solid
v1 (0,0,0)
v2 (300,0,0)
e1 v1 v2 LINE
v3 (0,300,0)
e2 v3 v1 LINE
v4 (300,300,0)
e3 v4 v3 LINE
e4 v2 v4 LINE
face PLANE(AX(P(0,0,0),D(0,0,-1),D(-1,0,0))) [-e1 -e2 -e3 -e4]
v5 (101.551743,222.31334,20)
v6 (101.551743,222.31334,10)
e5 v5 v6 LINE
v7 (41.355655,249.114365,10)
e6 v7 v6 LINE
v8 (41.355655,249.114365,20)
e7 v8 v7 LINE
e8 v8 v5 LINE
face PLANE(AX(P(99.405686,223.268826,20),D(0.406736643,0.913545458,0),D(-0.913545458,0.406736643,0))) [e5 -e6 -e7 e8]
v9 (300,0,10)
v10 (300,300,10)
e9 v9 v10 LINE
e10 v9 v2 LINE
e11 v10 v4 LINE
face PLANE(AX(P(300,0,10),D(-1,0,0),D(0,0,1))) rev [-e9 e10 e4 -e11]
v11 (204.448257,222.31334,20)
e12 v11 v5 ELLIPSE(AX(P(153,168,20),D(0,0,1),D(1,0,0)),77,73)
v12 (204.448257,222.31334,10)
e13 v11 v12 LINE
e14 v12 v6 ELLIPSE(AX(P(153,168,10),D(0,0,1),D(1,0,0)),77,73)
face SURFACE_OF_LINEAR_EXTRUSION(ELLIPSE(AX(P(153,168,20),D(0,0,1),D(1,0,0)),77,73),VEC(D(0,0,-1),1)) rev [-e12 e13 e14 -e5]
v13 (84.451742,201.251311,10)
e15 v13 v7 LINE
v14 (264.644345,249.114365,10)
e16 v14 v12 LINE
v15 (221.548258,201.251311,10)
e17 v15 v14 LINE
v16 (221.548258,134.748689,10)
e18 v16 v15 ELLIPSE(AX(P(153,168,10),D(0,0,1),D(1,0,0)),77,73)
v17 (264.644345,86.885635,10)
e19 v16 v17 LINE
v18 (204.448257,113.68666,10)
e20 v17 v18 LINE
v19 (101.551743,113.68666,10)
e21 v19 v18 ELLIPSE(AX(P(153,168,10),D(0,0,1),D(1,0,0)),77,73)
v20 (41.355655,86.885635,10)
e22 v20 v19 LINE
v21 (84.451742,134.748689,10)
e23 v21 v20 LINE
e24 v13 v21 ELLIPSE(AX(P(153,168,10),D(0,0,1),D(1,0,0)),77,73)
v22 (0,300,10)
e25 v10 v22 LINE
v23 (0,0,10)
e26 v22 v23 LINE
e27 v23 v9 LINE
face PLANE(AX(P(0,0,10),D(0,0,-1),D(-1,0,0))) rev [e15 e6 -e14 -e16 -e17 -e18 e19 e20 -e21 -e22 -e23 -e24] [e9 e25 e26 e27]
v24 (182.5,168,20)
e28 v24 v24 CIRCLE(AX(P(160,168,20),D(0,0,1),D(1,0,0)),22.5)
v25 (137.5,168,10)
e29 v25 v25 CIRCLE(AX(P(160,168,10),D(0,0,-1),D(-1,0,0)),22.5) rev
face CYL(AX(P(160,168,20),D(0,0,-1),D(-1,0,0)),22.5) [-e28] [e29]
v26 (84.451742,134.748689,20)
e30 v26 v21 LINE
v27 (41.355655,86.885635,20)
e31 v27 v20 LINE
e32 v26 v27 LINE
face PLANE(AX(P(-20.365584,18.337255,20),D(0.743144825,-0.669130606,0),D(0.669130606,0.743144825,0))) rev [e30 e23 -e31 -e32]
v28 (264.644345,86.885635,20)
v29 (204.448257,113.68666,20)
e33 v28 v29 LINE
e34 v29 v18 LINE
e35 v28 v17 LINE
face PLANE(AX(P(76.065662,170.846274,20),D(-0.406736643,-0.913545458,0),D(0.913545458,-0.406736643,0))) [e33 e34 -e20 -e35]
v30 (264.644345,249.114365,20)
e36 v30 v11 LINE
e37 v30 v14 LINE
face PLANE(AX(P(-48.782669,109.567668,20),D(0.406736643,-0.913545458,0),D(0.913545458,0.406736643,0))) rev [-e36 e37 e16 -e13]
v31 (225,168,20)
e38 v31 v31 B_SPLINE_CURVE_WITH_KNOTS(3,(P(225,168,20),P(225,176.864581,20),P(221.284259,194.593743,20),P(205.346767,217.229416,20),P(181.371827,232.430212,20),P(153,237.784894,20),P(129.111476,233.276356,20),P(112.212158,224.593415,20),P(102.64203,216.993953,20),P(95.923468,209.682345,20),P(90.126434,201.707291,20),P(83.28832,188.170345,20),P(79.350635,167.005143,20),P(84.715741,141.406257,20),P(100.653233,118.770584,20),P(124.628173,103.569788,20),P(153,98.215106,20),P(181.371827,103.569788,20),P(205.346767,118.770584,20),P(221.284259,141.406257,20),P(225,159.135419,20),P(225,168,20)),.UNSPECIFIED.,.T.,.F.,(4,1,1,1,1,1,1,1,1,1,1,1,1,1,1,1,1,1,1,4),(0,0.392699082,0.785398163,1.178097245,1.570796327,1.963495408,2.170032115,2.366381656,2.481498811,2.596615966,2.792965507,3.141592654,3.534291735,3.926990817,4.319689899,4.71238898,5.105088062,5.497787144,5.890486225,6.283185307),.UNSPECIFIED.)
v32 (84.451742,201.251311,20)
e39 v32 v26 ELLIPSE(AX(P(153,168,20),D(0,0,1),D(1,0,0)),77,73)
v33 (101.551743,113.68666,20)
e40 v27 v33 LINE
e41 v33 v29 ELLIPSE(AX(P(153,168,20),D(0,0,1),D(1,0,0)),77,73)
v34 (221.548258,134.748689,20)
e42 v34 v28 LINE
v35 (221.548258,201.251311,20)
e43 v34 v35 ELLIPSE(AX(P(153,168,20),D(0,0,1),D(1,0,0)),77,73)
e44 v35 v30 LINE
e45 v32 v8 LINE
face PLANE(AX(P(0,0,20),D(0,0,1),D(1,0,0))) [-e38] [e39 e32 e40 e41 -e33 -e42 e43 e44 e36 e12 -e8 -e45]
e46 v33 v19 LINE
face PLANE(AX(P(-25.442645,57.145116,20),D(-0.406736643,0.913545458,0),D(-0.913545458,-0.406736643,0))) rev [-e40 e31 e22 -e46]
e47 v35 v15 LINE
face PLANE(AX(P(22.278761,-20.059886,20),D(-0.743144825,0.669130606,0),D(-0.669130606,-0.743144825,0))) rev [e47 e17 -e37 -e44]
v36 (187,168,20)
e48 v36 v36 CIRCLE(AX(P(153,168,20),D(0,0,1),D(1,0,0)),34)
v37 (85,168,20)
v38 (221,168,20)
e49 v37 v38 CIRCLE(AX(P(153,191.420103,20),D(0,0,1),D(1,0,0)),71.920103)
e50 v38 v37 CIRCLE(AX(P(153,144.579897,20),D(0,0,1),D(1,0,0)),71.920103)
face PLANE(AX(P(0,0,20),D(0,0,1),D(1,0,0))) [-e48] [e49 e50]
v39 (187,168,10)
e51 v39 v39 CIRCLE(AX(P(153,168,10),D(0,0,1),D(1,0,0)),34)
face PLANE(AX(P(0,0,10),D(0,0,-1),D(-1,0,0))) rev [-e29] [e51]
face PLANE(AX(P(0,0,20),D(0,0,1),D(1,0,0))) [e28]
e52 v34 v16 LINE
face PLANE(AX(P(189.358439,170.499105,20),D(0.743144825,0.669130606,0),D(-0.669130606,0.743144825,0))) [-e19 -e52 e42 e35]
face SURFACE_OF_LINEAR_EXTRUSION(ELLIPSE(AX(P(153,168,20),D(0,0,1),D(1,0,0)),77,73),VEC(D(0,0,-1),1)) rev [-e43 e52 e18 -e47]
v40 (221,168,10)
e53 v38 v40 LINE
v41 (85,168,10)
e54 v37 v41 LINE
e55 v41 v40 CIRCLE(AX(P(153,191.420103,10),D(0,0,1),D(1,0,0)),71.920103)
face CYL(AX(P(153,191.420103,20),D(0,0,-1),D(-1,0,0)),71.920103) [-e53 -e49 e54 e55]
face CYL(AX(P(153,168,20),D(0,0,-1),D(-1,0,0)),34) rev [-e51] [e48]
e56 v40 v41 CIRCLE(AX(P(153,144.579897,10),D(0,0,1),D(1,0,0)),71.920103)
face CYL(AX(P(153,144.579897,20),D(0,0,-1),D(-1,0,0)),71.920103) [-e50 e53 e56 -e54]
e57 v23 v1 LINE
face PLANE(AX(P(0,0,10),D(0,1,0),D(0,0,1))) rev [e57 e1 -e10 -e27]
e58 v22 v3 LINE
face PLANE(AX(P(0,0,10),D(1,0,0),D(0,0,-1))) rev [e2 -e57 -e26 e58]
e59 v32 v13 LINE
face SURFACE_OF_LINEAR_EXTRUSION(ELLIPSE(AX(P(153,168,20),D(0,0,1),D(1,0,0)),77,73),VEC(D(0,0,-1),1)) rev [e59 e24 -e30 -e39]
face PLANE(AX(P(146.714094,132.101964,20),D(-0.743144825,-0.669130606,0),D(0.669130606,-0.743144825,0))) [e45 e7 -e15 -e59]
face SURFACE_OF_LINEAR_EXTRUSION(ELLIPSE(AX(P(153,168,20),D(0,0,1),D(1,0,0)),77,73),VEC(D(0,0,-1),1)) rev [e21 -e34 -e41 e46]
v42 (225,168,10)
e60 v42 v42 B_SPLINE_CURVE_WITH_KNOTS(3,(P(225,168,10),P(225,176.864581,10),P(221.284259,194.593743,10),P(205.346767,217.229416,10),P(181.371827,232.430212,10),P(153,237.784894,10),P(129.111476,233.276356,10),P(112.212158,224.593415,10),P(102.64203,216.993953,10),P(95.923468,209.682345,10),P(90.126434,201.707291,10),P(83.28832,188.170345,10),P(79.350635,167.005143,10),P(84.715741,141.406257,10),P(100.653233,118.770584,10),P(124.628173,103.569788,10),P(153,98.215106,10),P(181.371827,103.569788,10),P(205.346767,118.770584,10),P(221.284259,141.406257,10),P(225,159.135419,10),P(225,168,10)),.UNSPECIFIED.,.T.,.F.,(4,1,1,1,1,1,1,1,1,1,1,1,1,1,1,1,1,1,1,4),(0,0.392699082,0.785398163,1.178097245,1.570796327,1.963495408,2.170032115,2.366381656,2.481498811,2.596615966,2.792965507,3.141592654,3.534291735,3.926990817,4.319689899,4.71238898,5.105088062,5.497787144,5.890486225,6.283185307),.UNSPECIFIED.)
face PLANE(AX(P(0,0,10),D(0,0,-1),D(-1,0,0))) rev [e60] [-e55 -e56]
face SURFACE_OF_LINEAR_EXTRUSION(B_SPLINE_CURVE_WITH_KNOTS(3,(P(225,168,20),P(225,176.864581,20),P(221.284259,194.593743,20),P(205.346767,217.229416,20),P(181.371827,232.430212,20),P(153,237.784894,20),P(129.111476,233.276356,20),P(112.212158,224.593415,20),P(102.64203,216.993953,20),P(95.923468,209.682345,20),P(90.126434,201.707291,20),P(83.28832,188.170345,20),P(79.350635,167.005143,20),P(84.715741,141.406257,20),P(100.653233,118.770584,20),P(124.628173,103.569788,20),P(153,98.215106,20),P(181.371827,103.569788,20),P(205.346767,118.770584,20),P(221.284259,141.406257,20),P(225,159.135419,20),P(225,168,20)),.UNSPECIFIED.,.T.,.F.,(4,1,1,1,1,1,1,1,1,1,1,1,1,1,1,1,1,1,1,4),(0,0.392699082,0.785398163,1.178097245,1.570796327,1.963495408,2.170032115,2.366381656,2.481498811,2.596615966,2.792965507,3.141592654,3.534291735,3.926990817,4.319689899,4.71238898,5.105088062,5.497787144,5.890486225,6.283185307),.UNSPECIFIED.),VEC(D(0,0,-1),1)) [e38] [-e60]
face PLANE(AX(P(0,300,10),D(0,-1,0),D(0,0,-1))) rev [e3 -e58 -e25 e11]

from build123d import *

# Parameters (mm, degrees)
SKICA1_W                      = 300
SKICA1_H                      = 300
P_IDAT_VYSUNUT_M1_DEPTH       = 10
P_IDAT_VYSUNUT_M2_OUTLINE_R   = 34
P_IDAT_VYSUNUT_M2_OUTLINE_R_2 = 22.5
P_IDAT_VYSUNUT_M2_DEPTH       = 10


# Read off the part's stored shape, not the designer's step: Přidat vysunutím2
with BuildPart() as part:
    # Skica1 → Přidat vysunutím1 (new body)
    with BuildSketch(Plane.XY):
        with Locations((150, 150)):
            Rectangle(SKICA1_W, SKICA1_H)
    extrude(amount=P_IDAT_VYSUNUT_M1_DEPTH)

    # Přidat vysunutím2 outline → Přidat vysunutím2 (add)
    # profile 1 of 3: a face of its own
    with BuildSketch(Plane.XY.offset(10)):
        with BuildLine():
            Line((264.644345224, 249.114364816), (204.448257064, 222.313339624))
            add(Edge.make_bspline(
                [(204.448257064, 222.313339624), (153, 266.115859509), (101.551742936, 222.313339624)],
                knots=[0.839064453, 0.839064453, 0.839064453, 2.302528201, 2.302528201, 2.302528201], degree=2, weights=[1, 0.744018351, 1]))
            Line((101.551742936, 222.313339624), (41.355654776, 249.114364816))
            Line((41.355654776, 249.114364816), (84.451742425, 201.251310533))
            add(Edge.make_bspline(
                [(84.451742425, 201.251310533), (66.506189511, 168), (84.451742425, 134.748689467)],
                knots=[2.668661787, 2.668661787, 2.668661787, 3.614523521, 3.614523521, 3.614523521], degree=2, weights=[1, 0.890237111, 1]))
            Line((84.451742425, 134.748689467), (41.355654776, 86.885635184))
            Line((41.355654776, 86.885635184), (101.551742936, 113.686660376))
            add(Edge.make_bspline(
                [(101.551742936, 113.686660376), (153, 69.884140491), (204.448257064, 113.686660376)],
                knots=[3.980657106, 3.980657106, 3.980657106, 5.444120855, 5.444120855, 5.444120855], degree=2, weights=[1, 0.744018351, 1]))
            Line((204.448257064, 113.686660376), (264.644345224, 86.885635184))
            Line((264.644345224, 86.885635184), (221.548257575, 134.748689467))
            add(Edge.make_bspline(
                [(221.548257575, 134.748689467), (239.493810489, 168), (221.548257575, 201.251310533)],
                knots=[5.81025444, 5.81025444, 5.81025444, 6.756116174, 6.756116174, 6.756116174], degree=2, weights=[1, 0.890237111, 1]))
            Line((221.548257575, 201.251310533), (264.644345224, 249.114364816))
        make_face()
        with BuildLine():
            add(Edge.make_bspline(
                [(225, 168), (225, 176.864581058), (221.284259047, 194.593743175), (205.346766645, 217.22941635), (181.371826698, 232.430212202), (153, 237.784893899), (129.11147608, 233.276356498), (112.212158133, 224.593414956), (102.642030231, 216.993953421), (95.923468043, 209.682344585), (90.126433793, 201.707291075), (83.28831958, 188.170345197), (79.350635096, 167.005143483), (84.715740953, 141.406256825), (100.653233355, 118.77058365), (124.628173302, 103.569787798), (153, 98.215106101), (181.371826698, 103.569787798), (205.346766645, 118.77058365), (221.284259047, 141.406256825), (225, 159.135418942), (225, 168)],
                knots=[0, 0, 0, 0, 0.392699082, 0.785398163, 1.178097245, 1.570796327, 1.963495408, 2.170032115, 2.366381656, 2.481498811, 2.596615966, 2.792965507, 3.141592654, 3.534291735, 3.926990817, 4.319689899, 4.71238898, 5.105088062, 5.497787144, 5.890486225, 6.283185307, 6.283185307, 6.283185307, 6.283185307], degree=3))
        make_face(mode=Mode.SUBTRACT)
    # profile 2 of 3: a face of its own
    with BuildSketch(Plane.XY.offset(10)):
        with BuildLine():
            ThreePointArc((221, 168), (153, 216.5), (85, 168))
            ThreePointArc((85, 168), (153, 119.5), (221, 168))
        make_face()
        with Locations((153, 168)):
            Circle(P_IDAT_VYSUNUT_M2_OUTLINE_R, mode=Mode.SUBTRACT)
    # profile 3 of 3: a face of its own
    with BuildSketch(Plane.XY.offset(10)):
        with Locations((160, 168)):
            Circle(P_IDAT_VYSUNUT_M2_OUTLINE_R_2)
    extrude(amount=P_IDAT_VYSUNUT_M2_DEPTH)


solid = part.part
